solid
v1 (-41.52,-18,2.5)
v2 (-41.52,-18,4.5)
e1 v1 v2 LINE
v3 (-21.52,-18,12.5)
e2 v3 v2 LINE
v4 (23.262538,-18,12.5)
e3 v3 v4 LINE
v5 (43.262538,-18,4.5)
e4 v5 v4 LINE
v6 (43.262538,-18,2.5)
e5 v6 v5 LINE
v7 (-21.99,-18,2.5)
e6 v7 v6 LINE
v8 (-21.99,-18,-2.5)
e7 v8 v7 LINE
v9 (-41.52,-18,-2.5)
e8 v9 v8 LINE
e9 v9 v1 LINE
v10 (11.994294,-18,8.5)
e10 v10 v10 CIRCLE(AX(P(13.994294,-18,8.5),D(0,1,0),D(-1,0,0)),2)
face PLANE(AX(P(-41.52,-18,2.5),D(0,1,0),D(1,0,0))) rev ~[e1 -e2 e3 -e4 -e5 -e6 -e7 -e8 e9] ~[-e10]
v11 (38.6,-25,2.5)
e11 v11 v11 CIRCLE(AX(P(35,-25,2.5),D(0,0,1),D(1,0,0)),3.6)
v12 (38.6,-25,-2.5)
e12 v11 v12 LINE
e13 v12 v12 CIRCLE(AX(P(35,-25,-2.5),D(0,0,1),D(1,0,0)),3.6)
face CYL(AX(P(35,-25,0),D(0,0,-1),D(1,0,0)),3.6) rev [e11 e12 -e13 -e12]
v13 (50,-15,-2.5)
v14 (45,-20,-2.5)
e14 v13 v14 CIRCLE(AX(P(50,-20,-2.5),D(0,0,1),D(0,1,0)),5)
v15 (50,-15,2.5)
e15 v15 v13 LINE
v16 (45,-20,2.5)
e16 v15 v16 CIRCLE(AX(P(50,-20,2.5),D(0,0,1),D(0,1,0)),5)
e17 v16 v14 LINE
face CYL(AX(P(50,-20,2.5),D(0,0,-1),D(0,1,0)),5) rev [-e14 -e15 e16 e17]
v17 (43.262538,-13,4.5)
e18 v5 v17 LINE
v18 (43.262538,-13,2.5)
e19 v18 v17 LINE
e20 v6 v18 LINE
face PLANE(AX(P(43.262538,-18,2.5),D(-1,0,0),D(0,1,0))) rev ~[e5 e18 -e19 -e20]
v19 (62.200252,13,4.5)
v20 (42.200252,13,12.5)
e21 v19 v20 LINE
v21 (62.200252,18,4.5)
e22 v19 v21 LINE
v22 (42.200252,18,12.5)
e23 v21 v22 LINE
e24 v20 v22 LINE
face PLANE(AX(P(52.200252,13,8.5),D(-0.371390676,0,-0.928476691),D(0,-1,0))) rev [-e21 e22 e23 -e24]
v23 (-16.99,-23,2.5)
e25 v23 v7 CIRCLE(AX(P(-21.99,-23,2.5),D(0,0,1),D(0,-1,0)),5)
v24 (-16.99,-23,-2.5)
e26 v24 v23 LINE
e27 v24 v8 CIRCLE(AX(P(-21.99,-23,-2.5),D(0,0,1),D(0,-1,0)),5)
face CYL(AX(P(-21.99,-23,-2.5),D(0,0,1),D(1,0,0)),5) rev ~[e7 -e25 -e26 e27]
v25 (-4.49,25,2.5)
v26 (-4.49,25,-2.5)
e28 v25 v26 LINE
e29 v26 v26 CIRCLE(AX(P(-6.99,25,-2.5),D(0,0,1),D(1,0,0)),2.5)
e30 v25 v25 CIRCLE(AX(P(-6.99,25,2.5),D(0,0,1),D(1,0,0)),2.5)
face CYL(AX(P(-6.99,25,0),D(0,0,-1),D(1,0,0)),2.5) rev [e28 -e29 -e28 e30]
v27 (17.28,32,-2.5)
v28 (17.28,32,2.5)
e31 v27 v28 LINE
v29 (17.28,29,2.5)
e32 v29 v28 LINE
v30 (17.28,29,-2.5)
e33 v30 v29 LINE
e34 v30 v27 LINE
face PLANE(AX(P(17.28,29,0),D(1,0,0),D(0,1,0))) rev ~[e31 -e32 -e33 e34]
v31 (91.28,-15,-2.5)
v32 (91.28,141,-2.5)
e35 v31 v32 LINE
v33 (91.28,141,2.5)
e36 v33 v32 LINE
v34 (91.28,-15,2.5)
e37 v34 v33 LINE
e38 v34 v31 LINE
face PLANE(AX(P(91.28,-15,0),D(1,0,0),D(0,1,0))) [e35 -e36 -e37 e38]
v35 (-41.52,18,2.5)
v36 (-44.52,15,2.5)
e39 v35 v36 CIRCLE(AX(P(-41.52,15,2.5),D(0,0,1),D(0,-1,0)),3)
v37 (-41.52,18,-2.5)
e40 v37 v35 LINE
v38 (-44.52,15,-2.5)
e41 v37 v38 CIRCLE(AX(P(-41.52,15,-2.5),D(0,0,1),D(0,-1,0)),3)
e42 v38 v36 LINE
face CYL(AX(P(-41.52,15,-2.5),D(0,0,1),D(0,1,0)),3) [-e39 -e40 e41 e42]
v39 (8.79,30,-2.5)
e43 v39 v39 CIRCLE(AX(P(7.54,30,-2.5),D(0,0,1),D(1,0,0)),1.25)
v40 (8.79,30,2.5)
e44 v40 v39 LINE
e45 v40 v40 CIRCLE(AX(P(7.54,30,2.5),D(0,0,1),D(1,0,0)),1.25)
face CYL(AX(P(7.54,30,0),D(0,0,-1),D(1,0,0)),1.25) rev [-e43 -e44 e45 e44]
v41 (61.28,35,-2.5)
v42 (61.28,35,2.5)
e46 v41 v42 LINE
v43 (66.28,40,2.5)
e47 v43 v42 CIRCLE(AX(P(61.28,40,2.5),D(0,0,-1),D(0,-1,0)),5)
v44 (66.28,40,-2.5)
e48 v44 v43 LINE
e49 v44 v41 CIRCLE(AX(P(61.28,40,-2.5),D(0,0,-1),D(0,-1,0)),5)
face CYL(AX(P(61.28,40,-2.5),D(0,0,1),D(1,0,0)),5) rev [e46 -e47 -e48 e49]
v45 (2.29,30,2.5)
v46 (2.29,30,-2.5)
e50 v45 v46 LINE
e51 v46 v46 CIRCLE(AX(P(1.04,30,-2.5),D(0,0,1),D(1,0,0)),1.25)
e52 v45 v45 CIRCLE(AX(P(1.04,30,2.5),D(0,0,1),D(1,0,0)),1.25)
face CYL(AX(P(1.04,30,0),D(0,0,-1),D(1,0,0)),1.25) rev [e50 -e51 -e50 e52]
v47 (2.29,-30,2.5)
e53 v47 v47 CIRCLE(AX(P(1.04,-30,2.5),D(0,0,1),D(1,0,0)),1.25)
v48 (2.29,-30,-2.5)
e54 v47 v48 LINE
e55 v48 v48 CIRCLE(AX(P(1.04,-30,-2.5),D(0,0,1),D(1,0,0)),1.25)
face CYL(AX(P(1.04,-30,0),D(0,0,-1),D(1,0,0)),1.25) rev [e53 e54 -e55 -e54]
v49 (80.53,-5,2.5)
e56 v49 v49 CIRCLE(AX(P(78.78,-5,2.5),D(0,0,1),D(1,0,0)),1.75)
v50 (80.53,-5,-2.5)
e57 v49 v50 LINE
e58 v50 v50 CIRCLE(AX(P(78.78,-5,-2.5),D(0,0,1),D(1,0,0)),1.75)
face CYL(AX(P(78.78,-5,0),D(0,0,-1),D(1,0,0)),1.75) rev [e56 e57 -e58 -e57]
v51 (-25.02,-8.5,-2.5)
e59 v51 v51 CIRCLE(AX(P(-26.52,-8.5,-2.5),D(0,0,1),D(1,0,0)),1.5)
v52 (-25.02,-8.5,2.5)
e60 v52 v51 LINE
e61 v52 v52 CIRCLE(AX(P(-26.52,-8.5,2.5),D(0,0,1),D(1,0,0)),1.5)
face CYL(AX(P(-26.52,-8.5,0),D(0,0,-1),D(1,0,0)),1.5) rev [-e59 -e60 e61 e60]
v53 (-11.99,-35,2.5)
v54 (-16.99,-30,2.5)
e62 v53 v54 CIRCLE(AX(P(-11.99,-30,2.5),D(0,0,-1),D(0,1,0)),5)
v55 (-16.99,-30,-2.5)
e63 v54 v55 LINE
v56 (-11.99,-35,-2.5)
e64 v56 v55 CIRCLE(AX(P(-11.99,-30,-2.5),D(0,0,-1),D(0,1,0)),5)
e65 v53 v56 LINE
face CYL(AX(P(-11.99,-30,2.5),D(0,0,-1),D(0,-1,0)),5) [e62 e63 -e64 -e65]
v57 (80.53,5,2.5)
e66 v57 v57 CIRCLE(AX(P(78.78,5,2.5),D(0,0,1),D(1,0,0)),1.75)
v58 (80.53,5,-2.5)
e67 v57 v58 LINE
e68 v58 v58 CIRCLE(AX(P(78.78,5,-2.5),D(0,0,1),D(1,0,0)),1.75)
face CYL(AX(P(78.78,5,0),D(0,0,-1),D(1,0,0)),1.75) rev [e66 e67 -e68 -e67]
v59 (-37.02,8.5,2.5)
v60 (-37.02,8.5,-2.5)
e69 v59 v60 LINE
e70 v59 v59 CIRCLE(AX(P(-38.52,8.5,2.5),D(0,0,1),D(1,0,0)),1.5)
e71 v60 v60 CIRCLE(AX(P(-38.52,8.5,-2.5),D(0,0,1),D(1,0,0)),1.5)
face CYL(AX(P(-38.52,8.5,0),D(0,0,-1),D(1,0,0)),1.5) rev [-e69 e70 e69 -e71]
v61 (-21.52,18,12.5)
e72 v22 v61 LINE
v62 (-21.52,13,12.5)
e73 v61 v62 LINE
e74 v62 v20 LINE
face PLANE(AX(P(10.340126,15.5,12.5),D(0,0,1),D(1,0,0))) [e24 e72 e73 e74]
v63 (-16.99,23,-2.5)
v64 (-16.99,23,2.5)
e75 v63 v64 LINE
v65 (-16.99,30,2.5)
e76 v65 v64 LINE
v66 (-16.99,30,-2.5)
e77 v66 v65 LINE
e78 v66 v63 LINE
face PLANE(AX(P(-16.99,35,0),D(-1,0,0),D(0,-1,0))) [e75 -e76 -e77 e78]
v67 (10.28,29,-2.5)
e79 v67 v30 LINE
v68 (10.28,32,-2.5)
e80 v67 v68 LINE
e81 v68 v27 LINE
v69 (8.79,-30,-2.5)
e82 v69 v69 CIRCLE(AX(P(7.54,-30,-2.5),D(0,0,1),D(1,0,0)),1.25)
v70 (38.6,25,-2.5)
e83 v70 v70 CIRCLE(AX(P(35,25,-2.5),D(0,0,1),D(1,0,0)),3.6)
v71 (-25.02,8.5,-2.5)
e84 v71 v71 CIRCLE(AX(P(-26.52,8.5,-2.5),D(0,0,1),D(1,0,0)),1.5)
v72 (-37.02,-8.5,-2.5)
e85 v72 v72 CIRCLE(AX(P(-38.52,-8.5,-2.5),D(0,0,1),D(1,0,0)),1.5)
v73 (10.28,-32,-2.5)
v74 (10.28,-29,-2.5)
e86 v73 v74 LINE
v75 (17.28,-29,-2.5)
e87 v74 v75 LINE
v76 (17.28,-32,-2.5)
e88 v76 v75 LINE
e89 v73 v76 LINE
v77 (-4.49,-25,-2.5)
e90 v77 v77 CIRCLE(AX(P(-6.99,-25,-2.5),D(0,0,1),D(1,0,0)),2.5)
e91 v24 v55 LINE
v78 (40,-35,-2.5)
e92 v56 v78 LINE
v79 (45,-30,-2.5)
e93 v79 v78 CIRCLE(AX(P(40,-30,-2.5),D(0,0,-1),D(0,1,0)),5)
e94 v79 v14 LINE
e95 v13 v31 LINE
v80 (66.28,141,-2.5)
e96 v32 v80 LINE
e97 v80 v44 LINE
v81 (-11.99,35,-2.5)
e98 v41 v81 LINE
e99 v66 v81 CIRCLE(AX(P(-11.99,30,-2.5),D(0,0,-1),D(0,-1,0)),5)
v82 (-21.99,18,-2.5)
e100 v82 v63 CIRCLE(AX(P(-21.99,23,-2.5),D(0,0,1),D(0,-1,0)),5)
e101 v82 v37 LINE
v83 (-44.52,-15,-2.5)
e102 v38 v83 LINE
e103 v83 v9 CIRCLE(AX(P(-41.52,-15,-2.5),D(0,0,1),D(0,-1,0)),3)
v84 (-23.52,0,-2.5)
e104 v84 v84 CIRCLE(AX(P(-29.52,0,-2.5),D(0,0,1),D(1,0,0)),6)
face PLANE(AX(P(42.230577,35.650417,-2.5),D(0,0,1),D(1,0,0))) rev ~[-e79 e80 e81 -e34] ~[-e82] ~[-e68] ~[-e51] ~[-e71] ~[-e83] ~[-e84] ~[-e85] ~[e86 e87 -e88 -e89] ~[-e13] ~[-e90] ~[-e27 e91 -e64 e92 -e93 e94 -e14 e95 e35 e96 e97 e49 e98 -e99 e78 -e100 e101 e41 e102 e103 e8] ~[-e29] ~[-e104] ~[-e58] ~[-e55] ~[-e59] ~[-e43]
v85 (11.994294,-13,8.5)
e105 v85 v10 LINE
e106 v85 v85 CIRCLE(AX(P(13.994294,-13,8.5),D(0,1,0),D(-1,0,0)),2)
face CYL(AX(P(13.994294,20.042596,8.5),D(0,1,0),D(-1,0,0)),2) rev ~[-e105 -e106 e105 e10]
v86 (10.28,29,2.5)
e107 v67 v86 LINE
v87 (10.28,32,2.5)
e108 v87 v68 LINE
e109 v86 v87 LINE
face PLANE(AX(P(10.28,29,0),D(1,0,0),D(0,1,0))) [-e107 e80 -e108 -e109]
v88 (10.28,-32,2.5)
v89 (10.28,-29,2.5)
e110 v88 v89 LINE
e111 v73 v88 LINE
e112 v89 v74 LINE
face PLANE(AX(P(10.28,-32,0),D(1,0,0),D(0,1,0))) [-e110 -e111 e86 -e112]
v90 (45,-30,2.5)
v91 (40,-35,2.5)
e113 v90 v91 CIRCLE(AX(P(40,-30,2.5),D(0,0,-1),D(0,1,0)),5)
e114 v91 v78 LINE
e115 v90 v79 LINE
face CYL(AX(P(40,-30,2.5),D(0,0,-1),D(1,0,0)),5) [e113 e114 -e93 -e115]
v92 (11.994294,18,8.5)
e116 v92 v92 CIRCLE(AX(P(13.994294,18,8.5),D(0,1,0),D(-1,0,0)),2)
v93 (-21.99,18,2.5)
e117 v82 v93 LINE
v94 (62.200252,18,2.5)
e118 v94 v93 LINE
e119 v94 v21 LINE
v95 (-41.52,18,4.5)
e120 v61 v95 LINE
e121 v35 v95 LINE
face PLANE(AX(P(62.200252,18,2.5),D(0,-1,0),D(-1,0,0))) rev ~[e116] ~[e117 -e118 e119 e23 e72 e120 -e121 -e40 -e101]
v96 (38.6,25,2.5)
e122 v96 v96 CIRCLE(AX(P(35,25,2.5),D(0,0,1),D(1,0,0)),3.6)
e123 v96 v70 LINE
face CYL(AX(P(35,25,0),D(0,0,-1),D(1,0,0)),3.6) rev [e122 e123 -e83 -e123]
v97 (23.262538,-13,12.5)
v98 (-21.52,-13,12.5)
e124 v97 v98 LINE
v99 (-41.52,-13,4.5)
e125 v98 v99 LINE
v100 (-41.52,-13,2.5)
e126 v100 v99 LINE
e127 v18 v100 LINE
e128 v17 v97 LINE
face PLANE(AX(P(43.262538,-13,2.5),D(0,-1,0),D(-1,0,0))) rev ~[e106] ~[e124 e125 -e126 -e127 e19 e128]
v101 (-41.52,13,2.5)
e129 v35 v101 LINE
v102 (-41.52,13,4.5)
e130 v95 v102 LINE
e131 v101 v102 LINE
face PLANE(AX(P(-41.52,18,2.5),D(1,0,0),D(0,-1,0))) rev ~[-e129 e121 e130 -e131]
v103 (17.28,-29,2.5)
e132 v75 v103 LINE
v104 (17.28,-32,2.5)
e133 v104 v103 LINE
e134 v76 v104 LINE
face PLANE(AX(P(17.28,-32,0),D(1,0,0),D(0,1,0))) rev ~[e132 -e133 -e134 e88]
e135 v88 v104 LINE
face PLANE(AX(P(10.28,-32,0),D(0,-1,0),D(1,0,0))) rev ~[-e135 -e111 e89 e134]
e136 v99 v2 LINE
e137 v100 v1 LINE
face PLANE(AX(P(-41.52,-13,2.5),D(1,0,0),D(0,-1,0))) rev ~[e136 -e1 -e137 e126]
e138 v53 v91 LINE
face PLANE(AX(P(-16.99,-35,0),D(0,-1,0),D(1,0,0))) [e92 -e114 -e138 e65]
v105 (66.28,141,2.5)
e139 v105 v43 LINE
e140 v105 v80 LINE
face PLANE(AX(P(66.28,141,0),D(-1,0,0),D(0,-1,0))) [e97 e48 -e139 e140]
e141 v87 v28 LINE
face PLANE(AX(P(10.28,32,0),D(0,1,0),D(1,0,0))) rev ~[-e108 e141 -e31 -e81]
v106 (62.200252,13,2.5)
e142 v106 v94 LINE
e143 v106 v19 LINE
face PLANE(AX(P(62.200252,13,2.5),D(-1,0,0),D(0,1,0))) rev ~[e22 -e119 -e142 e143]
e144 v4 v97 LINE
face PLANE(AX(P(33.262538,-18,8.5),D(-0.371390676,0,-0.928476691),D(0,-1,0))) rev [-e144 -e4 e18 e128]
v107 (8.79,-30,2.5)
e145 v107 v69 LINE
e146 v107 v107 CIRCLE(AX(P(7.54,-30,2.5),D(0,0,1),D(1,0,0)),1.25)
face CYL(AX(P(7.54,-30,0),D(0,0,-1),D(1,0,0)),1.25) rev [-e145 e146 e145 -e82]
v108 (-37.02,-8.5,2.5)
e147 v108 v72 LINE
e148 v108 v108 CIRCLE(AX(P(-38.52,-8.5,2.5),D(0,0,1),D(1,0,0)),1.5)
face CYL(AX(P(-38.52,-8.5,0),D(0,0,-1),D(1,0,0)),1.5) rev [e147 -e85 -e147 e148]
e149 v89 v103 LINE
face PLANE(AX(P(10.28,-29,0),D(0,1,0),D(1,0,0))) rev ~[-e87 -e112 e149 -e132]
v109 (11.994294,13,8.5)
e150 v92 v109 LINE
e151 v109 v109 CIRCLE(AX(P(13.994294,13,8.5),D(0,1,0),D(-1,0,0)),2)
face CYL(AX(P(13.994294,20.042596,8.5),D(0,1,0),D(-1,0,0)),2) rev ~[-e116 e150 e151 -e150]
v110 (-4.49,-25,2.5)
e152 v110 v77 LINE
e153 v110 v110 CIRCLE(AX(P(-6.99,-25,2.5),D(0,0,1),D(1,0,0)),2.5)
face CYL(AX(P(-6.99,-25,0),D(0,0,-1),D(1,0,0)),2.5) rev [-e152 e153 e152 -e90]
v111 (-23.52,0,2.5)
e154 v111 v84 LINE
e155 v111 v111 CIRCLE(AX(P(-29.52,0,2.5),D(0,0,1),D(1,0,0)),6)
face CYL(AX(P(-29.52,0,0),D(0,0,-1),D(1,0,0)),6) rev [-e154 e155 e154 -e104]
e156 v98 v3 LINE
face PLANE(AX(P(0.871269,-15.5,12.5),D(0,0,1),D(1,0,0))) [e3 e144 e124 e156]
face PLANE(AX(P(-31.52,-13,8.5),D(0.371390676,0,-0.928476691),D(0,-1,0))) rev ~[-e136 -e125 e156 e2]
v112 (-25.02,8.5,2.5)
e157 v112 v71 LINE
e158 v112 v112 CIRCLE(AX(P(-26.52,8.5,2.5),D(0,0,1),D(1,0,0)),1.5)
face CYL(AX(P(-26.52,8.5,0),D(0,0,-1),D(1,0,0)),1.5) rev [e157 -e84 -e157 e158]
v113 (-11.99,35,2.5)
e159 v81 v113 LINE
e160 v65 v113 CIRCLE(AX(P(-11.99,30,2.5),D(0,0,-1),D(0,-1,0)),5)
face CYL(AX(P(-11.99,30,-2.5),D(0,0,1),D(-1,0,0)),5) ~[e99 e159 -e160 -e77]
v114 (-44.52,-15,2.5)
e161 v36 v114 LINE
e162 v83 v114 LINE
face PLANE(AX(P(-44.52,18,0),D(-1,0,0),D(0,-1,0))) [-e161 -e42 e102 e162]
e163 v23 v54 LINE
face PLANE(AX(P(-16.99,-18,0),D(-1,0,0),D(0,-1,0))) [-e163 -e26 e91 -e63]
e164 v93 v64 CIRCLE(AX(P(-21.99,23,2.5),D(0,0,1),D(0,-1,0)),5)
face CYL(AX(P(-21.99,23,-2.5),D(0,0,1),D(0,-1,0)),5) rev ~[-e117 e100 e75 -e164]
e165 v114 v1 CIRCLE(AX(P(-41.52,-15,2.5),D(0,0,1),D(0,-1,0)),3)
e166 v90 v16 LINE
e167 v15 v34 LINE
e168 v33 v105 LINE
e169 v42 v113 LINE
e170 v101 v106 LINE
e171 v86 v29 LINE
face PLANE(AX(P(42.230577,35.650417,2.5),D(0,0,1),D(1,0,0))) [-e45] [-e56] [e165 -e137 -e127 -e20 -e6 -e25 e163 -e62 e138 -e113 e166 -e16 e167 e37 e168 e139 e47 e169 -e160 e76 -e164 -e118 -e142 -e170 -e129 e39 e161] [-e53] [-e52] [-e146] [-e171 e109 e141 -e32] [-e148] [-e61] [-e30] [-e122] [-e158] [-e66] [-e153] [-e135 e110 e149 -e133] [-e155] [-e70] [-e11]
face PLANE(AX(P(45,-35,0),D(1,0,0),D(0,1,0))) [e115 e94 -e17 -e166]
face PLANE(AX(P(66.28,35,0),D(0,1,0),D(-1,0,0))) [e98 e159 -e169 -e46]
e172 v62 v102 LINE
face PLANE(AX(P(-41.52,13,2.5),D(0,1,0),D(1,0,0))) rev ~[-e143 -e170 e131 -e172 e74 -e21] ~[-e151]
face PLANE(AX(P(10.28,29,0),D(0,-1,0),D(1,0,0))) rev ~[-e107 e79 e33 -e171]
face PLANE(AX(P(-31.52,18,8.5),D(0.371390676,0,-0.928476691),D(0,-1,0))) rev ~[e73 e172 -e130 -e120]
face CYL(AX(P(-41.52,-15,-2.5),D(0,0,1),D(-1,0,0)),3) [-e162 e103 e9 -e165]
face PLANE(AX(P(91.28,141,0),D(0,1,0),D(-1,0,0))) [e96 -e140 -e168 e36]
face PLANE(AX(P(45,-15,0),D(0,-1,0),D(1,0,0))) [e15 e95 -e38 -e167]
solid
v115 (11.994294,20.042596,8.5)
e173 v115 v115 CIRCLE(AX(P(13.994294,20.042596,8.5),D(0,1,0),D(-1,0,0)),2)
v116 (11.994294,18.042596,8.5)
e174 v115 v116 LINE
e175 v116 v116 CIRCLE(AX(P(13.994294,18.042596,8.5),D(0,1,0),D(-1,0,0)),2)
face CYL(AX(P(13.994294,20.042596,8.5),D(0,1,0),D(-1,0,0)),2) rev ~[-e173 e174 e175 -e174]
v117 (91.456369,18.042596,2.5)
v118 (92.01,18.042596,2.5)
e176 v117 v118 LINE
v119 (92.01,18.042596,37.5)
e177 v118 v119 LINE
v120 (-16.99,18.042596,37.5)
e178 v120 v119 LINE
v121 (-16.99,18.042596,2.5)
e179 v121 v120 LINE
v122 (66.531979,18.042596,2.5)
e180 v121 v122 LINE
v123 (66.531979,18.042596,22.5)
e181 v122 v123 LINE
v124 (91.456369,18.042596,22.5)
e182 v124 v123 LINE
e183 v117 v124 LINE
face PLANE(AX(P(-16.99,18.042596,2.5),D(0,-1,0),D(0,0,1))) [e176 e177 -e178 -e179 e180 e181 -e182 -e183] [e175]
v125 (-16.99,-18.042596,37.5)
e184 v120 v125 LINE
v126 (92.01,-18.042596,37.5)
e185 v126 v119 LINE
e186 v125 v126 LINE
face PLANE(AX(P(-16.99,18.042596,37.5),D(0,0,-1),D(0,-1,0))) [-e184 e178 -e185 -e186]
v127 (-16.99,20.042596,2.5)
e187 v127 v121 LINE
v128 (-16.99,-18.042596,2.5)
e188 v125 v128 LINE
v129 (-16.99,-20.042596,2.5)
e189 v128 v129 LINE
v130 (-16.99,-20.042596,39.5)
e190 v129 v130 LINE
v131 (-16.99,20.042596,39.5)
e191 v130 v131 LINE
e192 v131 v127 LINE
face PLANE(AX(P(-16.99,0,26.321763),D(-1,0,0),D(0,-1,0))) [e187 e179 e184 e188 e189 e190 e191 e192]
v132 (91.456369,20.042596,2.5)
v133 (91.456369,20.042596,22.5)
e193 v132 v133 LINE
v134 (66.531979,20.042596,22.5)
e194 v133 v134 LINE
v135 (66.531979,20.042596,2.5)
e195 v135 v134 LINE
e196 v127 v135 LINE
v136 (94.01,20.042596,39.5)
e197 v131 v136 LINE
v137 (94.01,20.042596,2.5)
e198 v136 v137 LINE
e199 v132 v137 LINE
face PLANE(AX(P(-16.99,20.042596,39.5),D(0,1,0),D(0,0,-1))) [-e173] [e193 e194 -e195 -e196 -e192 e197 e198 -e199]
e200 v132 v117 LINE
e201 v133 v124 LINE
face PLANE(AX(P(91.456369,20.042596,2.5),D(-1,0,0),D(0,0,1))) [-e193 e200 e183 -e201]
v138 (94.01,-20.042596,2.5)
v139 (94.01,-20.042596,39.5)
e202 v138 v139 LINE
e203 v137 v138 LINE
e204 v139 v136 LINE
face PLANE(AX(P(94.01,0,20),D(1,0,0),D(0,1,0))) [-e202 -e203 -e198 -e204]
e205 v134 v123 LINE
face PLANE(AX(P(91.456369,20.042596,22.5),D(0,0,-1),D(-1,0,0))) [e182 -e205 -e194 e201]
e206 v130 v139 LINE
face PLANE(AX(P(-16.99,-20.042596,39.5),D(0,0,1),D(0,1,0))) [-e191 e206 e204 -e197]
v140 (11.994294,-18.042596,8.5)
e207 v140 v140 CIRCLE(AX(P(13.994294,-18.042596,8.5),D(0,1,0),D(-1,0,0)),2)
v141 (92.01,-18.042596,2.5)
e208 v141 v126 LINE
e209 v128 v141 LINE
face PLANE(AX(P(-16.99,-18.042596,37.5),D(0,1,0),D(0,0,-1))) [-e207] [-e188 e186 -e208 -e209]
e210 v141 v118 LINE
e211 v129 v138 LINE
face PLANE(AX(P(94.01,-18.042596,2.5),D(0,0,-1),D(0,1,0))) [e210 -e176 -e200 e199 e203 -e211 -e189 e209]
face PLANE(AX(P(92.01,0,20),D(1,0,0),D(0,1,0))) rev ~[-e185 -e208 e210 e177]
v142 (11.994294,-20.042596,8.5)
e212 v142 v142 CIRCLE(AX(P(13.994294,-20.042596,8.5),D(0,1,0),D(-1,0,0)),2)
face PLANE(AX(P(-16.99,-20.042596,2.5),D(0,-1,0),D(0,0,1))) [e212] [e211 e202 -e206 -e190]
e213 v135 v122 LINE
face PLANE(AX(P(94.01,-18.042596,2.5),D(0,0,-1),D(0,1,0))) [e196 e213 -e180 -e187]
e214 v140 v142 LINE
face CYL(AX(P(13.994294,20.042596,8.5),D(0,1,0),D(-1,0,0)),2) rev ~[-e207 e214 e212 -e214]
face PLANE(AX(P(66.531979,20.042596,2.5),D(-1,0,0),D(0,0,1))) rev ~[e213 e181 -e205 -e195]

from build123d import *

# Parameters (mm, degrees)
F0_R        = 1.5
F0_R_2      = 6
F0_R_3      = 2.5
F0_R_4      = 1.25
F0_W        = 7
F0_H        = 3
F0_R_5      = 3.6
F0_R_6      = 1.75
F1_DEPTH    = 2.5
F2_R        = 5
F3_R        = 3
F6_DEPTH    = 10
F7_C1_SIZE2 = 20
F7_C1_SIZE  = 8
F7_C2_SIZE2 = 8
F7_C2_SIZE  = 20
F7_C3_SIZE2 = 20
F7_C3_SIZE  = 8
F7_C4_SIZE2 = 8
F7_C4_SIZE  = 20
F10_DEPTH   = 111
F11_W       = 36.0851921141
F11_H       = 35
F12_DEPTH   = 2
F13_W       = 24.924390018
F13_H       = 20
F14_DEPTH   = 2
F15_R       = 2
F16_DEPTH   = 55.0435960571


# Not quite as in the source:
# - two fillets or chamfers of one size are made in one step


with BuildPart() as f1:
    # F0 (on Top) → F1 (new body, symmetric)
    with BuildSketch(Plane.XY):
        Polygon((66.28, 141), (66.28, 35), (-16.99, 35), (-16.99, 18), (-44.52, 18), (-44.52, -18), (-16.99, -18), (-16.99, -35), (45, -35), (45, -15), (91.28, -15), (91.28, 141), align=None)
        with Locations((-38.52, -8.5)):
            Circle(F0_R, mode=Mode.SUBTRACT)
        with Locations((-38.52, 8.5)):
            Circle(F0_R, mode=Mode.SUBTRACT)
        with Locations((-29.52, 0)):
            Circle(F0_R_2, mode=Mode.SUBTRACT)
        with Locations((-26.52, -8.5)):
            Circle(F0_R, mode=Mode.SUBTRACT)
        with Locations((-26.52, 8.5)):
            Circle(F0_R, mode=Mode.SUBTRACT)
        with Locations((-6.99, -25)):
            Circle(F0_R_3, mode=Mode.SUBTRACT)
        with Locations((1.04, -30)):
            Circle(F0_R_4, mode=Mode.SUBTRACT)
        with Locations((7.54, -30)):
            Circle(F0_R_4, mode=Mode.SUBTRACT)
        with Locations((13.78, -30.5)):
            Rectangle(F0_W, F0_H, mode=Mode.SUBTRACT)
        with Locations((-6.99, 25)):
            Circle(F0_R_3, mode=Mode.SUBTRACT)
        with Locations((1.04, 30)):
            Circle(F0_R_4, mode=Mode.SUBTRACT)
        with Locations((7.54, 30)):
            Circle(F0_R_4, mode=Mode.SUBTRACT)
        with Locations((13.78, 30.5)):
            Rectangle(F0_W, F0_H, mode=Mode.SUBTRACT)
        with Locations((35, -25)):
            Circle(F0_R_5, mode=Mode.SUBTRACT)
        with Locations((78.78, -5)):
            Circle(F0_R_6, mode=Mode.SUBTRACT)
        with Locations((78.78, 5)):
            Circle(F0_R_6, mode=Mode.SUBTRACT)
        with Locations((35, 25)):
            Circle(F0_R_5, mode=Mode.SUBTRACT)
    extrude(amount=F1_DEPTH, both=True)

    # F2
    f2_edges = [f1.edges().sort_by_distance(p)[0] for p in [
        (-16.99, -35, 0),
        (66.28, 35, 0),
        (45, -15, 0),
        (45, -35, 0),
        (-16.99, -18, 0),
        (-16.99, 18, 0),
        (-16.99, 35, 0),
    ]]
    fillet(f2_edges, radius=F2_R)

    # F3
    f3_edges = [f1.edges().sort_by_distance(p)[0] for p in [
        (-44.52, -18, 0),
        (-44.52, 18, 0),
    ]]
    fillet(f3_edges, radius=F3_R)

    # F5 (on face) → F6 (join)
    with BuildSketch(Plane.XY.offset(2.5)):
        Polygon((-21.99, 18), (-41.52, 18), (-41.52, 13), (62.2002519667, 13), (62.2002519667, 18), align=None)
        Polygon((-41.52, -13), (-41.52, -18), (-21.99, -18), (43.2625375688, -18), (43.2625375688, -13), align=None)
    extrude(amount=F6_DEPTH)

    # F7: chamfer of 8 x 20 on 4 edges, made by hand

    # F7_c1
    f7_c1_edges = [f1.edges().sort_by_distance(p)[0] for p in [
        (62.2002519667, 15.5, 12.5),
    ]]
    f7_c1_side = f1.faces().sort_by_distance((62.2002519667, 15.5, 12.34))[0]
    chamfer(f7_c1_edges, length=F7_C1_SIZE, length2=F7_C1_SIZE2, reference=f7_c1_side)

    # F7_c2
    f7_c2_edges = [f1.edges().sort_by_distance(p)[0] for p in [
        (-41.52, 15.5, 12.5),
    ]]
    f7_c2_side = f1.faces().sort_by_distance((-41.36, 15.5, 12.5))[0]
    chamfer(f7_c2_edges, length=F7_C2_SIZE, length2=F7_C2_SIZE2, reference=f7_c2_side)

    # F7_c3
    f7_c3_edges = [f1.edges().sort_by_distance(p)[0] for p in [
        (43.2625375688, -15.5, 12.5),
    ]]
    f7_c3_side = f1.faces().sort_by_distance((43.2625375688, -15.5, 12.34))[0]
    chamfer(f7_c3_edges, length=F7_C3_SIZE, length2=F7_C3_SIZE2, reference=f7_c3_side)

    # F7_c4
    f7_c4_edges = [f1.edges().sort_by_distance(p)[0] for p in [
        (-41.52, -15.5, 12.5),
    ]]
    f7_c4_side = f1.faces().sort_by_distance((-41.36, -15.5, 12.5))[0]
    chamfer(f7_c4_edges, length=F7_C4_SIZE, length2=F7_C4_SIZE2, reference=f7_c4_side)


with BuildPart() as f10:
    # F9 (on face) → F10 (new body)
    with BuildSketch(Plane(origin=(-16.99, 0, 0), x_dir=(0, -1, 0), z_dir=(-1, 0, 0))):
        Polygon((-20.0425960571, 2.5), (-18.0425960571, 2.5), (-18.0425960571, 37.5), (18.0425960571, 37.5), (18.0425960571, 2.5), (20.0425960571, 2.5), (20.0425960571, 39.5), (-20.0425960571, 39.5), align=None)
    extrude(amount=-F10_DEPTH)

    # F11 (on face) → F12 (join)
    with BuildSketch(Plane.YZ.offset(94.01)):
        with Locations((0, 20)):
            Rectangle(F11_W, F11_H)
    extrude(amount=-F12_DEPTH)

    # F13 (on face) → F14 (cut)
    with BuildSketch(Plane(origin=(0, 20.0425960571, 0), x_dir=(-1, 0, 0), z_dir=(0, 1, 0))):
        with Locations((-78.9941735566, 12.5)):
            Rectangle(F13_W, F13_H)
    extrude(amount=-F14_DEPTH, mode=Mode.SUBTRACT)


with BuildPart() as f16_tool:
    # F15 (on face) → F16 (new body, through all)
    with BuildSketch(Plane(origin=(0, 20.0425960571, 0), x_dir=(-1, 0, 0), z_dir=(0, 1, 0))):
        with Locations((-13.9942942187, 8.5)):
            Circle(F15_R)
    extrude(amount=-F16_DEPTH)


with BuildPart() as f1_1:
    add(f1.part)

    # F16: cut by f16_tool
    add(f16_tool.part, mode=Mode.SUBTRACT)


with BuildPart() as f10_1:
    add(f10.part)

    # F16: cut by f16_tool
    add(f16_tool.part, mode=Mode.SUBTRACT)


solid = Compound([f1_1.part, f10_1.part])
